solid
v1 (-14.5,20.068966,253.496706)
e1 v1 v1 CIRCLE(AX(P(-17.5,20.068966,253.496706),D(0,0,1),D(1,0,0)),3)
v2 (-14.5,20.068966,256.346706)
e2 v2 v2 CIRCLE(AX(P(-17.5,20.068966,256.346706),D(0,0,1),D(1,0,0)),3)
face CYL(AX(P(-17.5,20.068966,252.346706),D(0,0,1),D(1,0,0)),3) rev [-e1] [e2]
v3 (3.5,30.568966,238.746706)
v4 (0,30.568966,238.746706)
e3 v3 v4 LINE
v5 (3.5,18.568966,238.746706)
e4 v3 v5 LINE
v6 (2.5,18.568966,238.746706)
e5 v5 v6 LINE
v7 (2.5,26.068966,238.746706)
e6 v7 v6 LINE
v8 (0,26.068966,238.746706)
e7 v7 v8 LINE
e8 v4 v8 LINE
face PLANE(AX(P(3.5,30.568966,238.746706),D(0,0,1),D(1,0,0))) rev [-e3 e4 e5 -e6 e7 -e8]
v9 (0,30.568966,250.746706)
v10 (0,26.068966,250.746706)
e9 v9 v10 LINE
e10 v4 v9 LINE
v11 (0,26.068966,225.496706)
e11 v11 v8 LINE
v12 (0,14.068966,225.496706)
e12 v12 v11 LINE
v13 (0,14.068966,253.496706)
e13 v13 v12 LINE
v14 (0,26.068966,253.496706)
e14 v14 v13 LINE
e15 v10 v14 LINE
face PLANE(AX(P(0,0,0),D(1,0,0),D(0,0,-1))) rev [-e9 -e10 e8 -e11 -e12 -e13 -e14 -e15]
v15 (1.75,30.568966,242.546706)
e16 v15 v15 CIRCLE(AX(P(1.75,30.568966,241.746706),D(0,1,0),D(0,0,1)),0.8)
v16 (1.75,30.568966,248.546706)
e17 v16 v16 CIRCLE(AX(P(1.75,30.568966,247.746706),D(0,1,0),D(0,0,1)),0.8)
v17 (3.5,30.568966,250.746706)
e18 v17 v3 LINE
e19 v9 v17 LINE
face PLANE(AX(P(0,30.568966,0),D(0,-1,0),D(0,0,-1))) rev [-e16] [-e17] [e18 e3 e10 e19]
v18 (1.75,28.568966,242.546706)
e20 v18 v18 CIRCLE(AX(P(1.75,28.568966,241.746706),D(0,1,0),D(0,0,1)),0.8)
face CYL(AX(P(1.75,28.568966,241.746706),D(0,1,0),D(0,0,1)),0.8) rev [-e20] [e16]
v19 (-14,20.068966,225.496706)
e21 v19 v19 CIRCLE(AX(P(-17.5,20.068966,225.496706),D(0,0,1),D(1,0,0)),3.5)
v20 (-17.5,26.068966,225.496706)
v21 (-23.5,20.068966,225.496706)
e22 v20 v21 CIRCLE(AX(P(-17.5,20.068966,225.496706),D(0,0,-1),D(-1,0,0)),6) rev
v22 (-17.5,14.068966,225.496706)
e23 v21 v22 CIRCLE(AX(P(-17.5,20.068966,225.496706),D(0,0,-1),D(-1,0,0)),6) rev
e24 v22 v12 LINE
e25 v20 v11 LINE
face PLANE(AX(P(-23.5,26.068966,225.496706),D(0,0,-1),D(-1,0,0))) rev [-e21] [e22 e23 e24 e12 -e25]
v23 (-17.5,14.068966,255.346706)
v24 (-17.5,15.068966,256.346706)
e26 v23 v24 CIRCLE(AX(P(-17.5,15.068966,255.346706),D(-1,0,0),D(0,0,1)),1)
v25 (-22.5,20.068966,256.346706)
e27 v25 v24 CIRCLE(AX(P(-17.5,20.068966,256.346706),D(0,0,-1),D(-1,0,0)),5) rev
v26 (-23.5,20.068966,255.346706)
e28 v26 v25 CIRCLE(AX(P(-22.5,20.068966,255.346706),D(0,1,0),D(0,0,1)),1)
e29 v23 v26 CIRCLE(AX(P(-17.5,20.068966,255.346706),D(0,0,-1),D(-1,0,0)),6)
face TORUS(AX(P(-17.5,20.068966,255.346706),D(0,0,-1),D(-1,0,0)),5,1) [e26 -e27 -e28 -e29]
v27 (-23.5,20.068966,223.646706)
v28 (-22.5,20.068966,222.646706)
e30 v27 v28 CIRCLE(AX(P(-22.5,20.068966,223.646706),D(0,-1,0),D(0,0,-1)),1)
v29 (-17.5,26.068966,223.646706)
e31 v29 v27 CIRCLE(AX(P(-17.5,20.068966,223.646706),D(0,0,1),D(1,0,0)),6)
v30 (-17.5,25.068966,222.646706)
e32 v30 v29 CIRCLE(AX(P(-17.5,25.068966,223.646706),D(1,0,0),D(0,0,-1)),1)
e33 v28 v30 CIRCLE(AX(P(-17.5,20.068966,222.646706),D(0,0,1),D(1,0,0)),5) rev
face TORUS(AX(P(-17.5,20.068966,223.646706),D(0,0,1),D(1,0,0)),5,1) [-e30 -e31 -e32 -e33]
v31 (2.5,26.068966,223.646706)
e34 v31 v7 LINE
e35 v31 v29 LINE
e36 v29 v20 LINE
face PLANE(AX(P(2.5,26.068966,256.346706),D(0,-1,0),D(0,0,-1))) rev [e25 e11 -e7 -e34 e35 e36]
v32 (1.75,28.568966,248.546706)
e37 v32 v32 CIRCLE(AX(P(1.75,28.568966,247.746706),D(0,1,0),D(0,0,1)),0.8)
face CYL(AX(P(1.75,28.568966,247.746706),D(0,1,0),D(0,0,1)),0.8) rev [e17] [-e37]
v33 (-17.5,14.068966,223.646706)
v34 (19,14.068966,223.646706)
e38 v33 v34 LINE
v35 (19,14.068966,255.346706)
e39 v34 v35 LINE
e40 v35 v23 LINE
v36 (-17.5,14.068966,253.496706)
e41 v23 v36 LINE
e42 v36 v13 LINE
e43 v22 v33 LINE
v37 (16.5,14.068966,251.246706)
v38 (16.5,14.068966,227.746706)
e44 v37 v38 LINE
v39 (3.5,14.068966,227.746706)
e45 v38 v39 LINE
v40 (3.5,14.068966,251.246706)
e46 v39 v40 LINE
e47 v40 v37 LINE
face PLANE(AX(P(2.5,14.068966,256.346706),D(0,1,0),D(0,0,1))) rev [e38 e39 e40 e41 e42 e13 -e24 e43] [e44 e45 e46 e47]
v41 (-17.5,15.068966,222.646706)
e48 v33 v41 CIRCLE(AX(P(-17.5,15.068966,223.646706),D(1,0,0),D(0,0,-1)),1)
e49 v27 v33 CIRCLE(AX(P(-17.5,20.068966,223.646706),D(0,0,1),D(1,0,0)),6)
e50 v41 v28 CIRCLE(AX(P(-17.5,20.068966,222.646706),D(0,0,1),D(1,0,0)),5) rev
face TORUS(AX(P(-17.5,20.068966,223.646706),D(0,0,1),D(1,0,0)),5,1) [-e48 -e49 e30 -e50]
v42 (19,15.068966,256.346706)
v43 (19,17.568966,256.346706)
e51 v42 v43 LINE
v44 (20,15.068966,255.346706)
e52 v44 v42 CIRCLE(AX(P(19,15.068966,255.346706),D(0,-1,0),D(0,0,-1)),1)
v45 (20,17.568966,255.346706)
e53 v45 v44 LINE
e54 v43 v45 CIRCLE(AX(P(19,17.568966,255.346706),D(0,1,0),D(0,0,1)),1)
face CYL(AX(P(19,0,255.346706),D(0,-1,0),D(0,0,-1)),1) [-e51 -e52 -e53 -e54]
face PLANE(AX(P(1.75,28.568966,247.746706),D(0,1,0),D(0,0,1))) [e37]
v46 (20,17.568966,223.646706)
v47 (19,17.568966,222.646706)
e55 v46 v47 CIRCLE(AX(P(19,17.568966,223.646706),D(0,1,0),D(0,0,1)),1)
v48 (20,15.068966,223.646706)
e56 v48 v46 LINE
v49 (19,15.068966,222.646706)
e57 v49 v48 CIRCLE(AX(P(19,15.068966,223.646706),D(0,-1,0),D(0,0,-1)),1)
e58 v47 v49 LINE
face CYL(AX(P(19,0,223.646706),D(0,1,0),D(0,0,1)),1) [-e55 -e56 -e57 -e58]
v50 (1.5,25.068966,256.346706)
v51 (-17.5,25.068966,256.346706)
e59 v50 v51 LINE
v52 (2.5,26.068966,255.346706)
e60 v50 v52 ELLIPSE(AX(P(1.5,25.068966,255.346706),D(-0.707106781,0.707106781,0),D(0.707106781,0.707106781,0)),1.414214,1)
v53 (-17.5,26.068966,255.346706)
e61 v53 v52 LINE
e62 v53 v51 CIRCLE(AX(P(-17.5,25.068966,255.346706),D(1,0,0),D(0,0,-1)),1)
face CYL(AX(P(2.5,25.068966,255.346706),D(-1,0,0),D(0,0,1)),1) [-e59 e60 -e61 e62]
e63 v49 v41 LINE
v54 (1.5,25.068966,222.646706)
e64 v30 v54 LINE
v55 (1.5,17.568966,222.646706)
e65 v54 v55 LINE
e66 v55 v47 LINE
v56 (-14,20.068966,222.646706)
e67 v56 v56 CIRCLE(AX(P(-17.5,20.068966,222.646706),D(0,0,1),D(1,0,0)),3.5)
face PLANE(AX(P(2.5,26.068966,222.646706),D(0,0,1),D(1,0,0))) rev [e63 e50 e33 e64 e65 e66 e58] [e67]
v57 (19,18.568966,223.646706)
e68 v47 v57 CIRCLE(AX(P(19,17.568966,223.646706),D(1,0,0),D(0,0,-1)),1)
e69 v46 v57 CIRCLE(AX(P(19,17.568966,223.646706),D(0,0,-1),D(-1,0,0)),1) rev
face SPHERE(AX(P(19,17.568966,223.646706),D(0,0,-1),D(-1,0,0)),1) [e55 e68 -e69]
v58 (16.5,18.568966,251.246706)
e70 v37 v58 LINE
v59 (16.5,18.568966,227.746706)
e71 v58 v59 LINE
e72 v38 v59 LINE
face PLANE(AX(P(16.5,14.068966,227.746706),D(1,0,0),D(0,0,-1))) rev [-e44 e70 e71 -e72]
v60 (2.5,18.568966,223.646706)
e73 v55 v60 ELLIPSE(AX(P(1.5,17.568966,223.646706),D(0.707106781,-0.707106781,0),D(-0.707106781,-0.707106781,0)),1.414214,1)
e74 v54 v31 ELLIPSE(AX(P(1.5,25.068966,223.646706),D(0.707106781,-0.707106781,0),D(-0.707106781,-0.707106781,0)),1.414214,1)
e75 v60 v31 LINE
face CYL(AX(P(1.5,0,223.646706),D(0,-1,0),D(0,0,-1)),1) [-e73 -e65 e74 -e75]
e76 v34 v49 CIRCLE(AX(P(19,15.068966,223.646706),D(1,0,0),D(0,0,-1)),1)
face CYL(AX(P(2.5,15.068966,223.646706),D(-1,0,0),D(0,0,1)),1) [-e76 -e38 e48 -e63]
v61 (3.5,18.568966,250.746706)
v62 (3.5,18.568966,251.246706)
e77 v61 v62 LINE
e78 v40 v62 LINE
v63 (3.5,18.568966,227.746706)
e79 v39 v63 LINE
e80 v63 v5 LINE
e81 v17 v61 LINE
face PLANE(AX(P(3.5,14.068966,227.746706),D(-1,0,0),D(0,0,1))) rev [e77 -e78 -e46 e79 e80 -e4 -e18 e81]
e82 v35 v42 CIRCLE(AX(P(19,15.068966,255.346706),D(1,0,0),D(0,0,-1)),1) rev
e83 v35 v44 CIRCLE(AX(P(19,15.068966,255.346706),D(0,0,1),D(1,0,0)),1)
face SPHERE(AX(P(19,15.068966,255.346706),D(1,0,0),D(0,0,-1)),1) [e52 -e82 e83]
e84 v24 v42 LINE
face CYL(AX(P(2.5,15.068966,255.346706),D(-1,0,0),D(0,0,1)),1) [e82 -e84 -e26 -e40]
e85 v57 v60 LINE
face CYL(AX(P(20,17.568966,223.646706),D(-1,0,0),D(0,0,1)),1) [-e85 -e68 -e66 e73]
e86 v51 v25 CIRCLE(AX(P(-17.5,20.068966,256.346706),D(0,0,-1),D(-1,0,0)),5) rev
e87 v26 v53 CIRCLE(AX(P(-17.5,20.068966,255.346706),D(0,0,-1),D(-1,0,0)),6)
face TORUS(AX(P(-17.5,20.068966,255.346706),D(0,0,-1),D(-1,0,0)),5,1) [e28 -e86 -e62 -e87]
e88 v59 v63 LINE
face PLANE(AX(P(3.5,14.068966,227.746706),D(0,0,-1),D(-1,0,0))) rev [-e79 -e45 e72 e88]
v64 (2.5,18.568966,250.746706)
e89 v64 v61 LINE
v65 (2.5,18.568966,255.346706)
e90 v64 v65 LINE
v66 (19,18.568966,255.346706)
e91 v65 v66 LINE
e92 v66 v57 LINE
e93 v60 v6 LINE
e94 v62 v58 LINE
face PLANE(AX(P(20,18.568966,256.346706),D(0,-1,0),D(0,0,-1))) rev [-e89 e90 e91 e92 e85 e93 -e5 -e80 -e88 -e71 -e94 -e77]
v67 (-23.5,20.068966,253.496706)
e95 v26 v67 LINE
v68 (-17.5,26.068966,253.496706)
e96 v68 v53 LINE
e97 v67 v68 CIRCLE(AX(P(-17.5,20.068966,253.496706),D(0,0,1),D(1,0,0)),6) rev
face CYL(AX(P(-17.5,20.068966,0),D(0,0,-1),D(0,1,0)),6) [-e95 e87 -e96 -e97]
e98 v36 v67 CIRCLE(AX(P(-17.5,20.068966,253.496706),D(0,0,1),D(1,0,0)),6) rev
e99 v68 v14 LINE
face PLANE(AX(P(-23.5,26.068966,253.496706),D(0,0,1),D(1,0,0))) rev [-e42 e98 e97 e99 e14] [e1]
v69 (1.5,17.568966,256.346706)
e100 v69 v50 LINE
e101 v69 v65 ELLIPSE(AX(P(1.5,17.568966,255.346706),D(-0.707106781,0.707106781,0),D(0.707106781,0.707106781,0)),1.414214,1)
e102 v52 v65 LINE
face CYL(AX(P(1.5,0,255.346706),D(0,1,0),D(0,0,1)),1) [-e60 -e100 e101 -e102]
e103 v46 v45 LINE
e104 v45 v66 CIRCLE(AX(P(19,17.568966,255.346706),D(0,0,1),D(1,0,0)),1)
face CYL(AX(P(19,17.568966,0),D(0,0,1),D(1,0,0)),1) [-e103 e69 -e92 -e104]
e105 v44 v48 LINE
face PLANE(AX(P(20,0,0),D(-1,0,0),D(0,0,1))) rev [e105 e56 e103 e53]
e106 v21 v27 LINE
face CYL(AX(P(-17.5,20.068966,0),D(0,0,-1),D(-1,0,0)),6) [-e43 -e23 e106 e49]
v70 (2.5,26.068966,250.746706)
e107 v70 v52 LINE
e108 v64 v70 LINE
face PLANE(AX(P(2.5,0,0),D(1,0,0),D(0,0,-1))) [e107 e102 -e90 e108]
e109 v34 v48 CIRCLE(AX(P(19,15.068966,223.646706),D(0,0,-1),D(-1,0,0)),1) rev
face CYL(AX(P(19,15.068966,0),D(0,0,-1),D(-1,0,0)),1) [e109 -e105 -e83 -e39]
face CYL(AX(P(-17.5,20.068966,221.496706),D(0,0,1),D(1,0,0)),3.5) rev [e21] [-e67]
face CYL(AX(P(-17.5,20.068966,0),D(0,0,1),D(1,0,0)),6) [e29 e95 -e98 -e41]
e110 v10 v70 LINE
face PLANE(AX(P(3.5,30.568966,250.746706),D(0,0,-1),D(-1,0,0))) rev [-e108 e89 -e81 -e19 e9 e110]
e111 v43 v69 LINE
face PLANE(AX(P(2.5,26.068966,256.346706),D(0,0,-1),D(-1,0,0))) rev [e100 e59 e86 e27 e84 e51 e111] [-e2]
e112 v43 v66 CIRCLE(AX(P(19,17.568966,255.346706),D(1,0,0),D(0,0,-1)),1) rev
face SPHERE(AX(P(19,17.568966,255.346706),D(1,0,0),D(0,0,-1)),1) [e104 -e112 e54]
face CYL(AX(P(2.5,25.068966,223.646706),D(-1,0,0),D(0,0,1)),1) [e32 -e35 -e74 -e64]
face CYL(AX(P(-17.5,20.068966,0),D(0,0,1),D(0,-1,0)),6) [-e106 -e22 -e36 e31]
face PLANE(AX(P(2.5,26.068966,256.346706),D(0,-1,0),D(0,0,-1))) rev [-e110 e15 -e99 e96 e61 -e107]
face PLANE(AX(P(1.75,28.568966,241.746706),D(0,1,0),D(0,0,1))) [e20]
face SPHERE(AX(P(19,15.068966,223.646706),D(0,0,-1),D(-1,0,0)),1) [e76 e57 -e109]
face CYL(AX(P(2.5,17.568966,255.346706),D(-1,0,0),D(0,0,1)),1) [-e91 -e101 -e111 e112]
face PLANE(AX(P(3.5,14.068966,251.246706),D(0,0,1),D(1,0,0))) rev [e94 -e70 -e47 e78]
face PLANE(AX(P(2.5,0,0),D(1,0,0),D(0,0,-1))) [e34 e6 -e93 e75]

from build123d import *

# Parameters (mm, degrees)
SKETCH1_W           = 33.7
SKETCH1_H           = 12
BOSS_EXTRUDE1_DEPTH = 2.5
SKETCH2_W           = 33.7
SKETCH2_H           = 4.5
BOSS_EXTRUDE2_DEPTH = 17.5
SKETCH3_W           = 13
SKETCH3_H           = 23.5
CUT_EXTRUDE1_DEPTH  = 258.235074474
SKETCH4_W           = 2.85
SKETCH4_H           = 12
BOSS_EXTRUDE3_DEPTH = 23.5
FILLET1_R           = 6
SKETCH5_R           = 3
CUT_EXTRUDE2_DEPTH  = 4
SKETCH6_R           = 3.5
CUT_EXTRUDE3_DEPTH  = 4
SKETCH7_W           = 3.5
SKETCH7_H           = 12
BOSS_EXTRUDE4_DEPTH = 12
FILLET2_R           = 1
SKETCH8_R           = 0.800000001
CUT_EXTRUDE4_DEPTH  = 2


with BuildPart() as part:
    # Sketch1 → Boss-Extrude1 (new body)
    with BuildSketch(Plane(origin=(0, 0, 0), x_dir=(0, 0, -1), z_dir=(1, 0, 0))):
        with Locations((-239.496705732, 20.068965517)):
            Rectangle(SKETCH1_W, SKETCH1_H)
    extrude(amount=BOSS_EXTRUDE1_DEPTH)

    # Sketch2 → Boss-Extrude2 (add)
    with BuildSketch(Plane(origin=(2.5, 0, 0), x_dir=(0, 0, -1), z_dir=(1, 0, 0))):
        with Locations((-239.496705732, 16.318965517)):
            Rectangle(SKETCH2_W, SKETCH2_H)
    extrude(amount=BOSS_EXTRUDE2_DEPTH)

    # Sketch3 → Cut-Extrude1 (cut, through all)
    with BuildSketch(Plane(origin=(0, 18.568965517, 0), x_dir=(1, 0, 0), z_dir=(0, 1, 0))):
        with Locations((10, -239.496705732)):
            Rectangle(SKETCH3_W, SKETCH3_H)
    extrude(amount=-CUT_EXTRUDE1_DEPTH, mode=Mode.SUBTRACT)

    # Sketch4 → Boss-Extrude3 (add)
    with BuildSketch(Plane.ZY):
        with Locations((224.071705732, 20.068965517)):
            Rectangle(SKETCH4_W, SKETCH4_H)
        with Locations((254.921705732, 20.068965517)):
            Rectangle(SKETCH4_W, SKETCH4_H)
    extrude(amount=BOSS_EXTRUDE3_DEPTH)

    # Fillet1
    fillet1_edges = [part.edges().sort_by_distance(p)[0] for p in [
        (-23.5, 14.068965517, 224.071705732),
        (-23.5, 26.068965517, 224.071705732),
        (-23.5, 14.068965517, 254.921705732),
        (-23.5, 26.068965517, 254.921705732),
    ]]
    fillet(fillet1_edges, radius=FILLET1_R - 0.0001)  # a hair under: the kernel refuses the full size

    # Sketch5 → Cut-Extrude2 (cut)
    with BuildSketch(Plane.XY.offset(256.346705732)):
        with Locations((-17.5, 20.068965517)):
            Circle(SKETCH5_R)
    extrude(amount=-CUT_EXTRUDE2_DEPTH, mode=Mode.SUBTRACT)

    # Sketch6 → Cut-Extrude3 (cut)
    with BuildSketch(Plane.XY.offset(225.496705732)):
        with Locations((-17.5, 20.068965517)):
            Circle(SKETCH6_R)
    extrude(amount=-CUT_EXTRUDE3_DEPTH, mode=Mode.SUBTRACT)

    # Sketch7 → Boss-Extrude4 (add)
    with BuildSketch(Plane(origin=(0, 18.568965517, 0), x_dir=(1, 0, 0), z_dir=(0, 1, 0))):
        with Locations((1.75, -244.746705732)):
            Rectangle(SKETCH7_W, SKETCH7_H)
    extrude(amount=BOSS_EXTRUDE4_DEPTH)

    # Fillet2
    fillet2_edges = [part.edges().sort_by_distance(p)[0] for p in [
        (2.5, 22.318965517, 222.646705732),
        (11.25, 18.568965517, 256.346705732),
        (11.25, 18.568965517, 222.646705732),
        (20, 16.318965517, 256.346705732),
        (20, 14.068965517, 239.496705732),
        (20, 16.318965517, 222.646705732),
        (20, 18.568965517, 239.496705732),
        (2.5, 22.318965517, 256.346705732),
        (-21.742669976, 24.311635494, 222.646705732),
        (-21.742669976, 15.826295541, 222.646705732),
        (-21.742669976, 24.311635494, 256.346705732),
        (-21.742669976, 15.826295541, 256.346705732),
        (-7.50005, 26.068965517, 256.346705732),
        (-7.50005, 26.068965517, 222.646705732),
        (1.24995, 14.068965517, 222.646705732),
        (1.24995, 14.068965517, 256.346705732),
    ]]
    fillet(fillet2_edges, radius=FILLET2_R)

    # Sketch8 → Cut-Extrude4 (cut)
    with BuildSketch(Plane(origin=(0, 30.568965517, 0), x_dir=(1, 0, 0), z_dir=(0, 1, 0))):
        with Locations(Location((1.75, -247.746705734, 0), (0, 0, 270))):
            Circle(SKETCH8_R)
        with Locations(Location((1.75, -241.746705734, 0), (0, 0, 270))):
            Circle(SKETCH8_R)
    extrude(amount=-CUT_EXTRUDE4_DEPTH, mode=Mode.SUBTRACT)


solid = part.part
